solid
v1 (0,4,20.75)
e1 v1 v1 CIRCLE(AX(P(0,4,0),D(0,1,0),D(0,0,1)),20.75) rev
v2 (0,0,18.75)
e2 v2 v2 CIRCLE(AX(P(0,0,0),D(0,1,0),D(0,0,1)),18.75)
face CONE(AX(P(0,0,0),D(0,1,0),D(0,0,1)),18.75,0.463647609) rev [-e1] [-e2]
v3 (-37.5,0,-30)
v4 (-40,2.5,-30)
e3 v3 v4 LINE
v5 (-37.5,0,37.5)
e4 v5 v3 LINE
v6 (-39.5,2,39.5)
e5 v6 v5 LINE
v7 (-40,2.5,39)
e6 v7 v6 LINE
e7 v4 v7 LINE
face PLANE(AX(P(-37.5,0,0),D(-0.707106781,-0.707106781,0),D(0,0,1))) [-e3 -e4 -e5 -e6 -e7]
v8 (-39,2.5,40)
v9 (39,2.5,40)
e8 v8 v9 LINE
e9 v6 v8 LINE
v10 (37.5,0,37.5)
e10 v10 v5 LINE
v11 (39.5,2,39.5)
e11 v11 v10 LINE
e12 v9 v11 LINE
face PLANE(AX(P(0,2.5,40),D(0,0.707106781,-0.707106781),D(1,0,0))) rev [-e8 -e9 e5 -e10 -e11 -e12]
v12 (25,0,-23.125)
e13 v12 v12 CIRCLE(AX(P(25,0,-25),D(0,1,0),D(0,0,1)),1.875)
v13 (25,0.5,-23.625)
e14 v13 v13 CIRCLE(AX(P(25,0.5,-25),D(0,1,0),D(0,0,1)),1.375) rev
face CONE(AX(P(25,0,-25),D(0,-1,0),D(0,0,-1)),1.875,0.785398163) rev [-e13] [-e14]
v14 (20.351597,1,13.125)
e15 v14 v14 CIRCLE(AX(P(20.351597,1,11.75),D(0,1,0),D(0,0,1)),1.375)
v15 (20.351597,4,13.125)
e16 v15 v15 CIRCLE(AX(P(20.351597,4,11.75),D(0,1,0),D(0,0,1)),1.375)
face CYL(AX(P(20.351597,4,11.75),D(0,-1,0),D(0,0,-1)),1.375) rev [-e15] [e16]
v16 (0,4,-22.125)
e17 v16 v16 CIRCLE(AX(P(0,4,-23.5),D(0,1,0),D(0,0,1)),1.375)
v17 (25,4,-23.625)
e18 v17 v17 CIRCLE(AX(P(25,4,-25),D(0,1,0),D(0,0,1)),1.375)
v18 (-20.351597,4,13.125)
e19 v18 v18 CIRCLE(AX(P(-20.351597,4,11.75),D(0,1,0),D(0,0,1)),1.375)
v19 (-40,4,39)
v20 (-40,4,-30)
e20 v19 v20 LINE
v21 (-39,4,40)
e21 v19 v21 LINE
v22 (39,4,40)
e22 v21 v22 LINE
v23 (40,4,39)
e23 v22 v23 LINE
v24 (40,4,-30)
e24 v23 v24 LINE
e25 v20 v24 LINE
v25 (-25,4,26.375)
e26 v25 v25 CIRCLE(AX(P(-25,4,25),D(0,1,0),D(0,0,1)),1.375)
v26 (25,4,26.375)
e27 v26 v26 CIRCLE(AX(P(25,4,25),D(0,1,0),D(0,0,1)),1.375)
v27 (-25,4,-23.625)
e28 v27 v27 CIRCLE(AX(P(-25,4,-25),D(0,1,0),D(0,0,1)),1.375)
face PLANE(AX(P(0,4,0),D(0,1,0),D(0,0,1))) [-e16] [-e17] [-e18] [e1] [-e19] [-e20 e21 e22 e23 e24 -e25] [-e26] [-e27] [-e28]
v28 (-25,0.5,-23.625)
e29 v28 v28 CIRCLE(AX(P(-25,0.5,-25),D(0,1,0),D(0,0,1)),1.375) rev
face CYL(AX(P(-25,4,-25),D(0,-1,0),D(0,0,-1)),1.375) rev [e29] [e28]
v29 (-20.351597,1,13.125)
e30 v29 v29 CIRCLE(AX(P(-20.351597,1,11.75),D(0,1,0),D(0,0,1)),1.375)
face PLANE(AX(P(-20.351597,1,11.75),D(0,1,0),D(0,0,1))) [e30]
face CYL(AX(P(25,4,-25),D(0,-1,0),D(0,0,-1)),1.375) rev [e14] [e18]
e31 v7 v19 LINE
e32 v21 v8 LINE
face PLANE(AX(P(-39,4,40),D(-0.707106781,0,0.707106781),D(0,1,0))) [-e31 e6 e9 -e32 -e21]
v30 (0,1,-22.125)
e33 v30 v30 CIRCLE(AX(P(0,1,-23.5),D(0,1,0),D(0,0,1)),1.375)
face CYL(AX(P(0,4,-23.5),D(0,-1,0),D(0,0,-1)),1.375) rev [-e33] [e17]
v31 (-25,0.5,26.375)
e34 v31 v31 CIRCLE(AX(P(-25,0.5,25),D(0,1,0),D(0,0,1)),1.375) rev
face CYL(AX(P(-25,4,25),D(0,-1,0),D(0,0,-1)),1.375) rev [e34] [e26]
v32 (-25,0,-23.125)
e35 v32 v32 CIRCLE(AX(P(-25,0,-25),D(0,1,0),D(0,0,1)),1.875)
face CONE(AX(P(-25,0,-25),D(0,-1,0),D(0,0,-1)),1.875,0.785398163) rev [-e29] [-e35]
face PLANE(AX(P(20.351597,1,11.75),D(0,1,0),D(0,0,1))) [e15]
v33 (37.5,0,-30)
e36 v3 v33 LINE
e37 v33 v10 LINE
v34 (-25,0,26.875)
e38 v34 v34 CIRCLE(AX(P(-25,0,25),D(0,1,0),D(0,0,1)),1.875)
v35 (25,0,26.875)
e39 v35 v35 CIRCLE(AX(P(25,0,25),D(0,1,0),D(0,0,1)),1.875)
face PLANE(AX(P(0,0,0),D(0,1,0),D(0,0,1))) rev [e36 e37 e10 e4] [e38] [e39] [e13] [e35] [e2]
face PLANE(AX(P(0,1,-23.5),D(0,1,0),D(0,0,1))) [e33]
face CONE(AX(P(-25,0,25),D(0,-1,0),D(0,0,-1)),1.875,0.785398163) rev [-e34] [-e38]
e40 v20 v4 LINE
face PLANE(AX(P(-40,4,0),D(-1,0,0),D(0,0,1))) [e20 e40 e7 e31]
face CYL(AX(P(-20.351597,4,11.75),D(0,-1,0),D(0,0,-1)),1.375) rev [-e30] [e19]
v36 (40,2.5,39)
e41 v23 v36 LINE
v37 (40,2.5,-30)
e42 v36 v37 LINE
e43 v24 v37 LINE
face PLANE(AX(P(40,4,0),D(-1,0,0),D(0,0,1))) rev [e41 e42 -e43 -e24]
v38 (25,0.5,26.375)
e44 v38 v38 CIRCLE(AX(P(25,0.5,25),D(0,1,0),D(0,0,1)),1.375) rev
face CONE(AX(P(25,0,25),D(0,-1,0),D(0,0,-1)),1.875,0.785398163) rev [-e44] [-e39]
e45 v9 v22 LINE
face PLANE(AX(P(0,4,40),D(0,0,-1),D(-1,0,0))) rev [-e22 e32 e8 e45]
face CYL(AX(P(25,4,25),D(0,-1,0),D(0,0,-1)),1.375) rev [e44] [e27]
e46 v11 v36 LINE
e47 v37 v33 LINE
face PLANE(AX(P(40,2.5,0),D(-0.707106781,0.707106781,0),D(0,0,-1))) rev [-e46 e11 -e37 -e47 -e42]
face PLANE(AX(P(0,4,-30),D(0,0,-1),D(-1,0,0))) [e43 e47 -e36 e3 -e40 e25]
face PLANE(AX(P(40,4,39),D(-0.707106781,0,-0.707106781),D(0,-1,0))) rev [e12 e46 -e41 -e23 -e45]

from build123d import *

# Parameters (mm, degrees)
SKETCH1_R           = 18.75
SKETCH1_W           = 80
SKETCH1_H           = 10
BOSS_EXTRUDE2_DEPTH = 4
CHAMFER2_SIZE2      = 4
CHAMFER2_SIZE       = 2
SKETCH1_3_R         = 1.375
BOSS_EXTRUDE3_DEPTH = 1
CHAMFER3_SIZE       = 0.5
CHAMFER4_SIZE       = 1
CHAMFER5_SIZE       = 2.5


# Some blends are built 0.0001 mm under size
with BuildPart() as part:
    # Sketch1 → Boss-Extrude2 (new body)
    # profile 1 of 2: a face of its own
    with BuildSketch(Plane(origin=(0, 0, 0), x_dir=(1, 0, 0), z_dir=(0, 1, 0))):
        Polygon((-25, 30), (-40, 30), (-40, -30), (40, -30), (40, 30), (25, 30), align=None)
        with BuildLine():
            ThreePointArc((-23.625, -25), (-25.972271824, -25.972271824), (-25, -23.625))
            ThreePointArc((-25, -23.625), (-24.027728176, -24.027728176), (-23.625, -25))
        make_face(mode=Mode.SUBTRACT)
        with BuildLine():
            ThreePointArc((-19.629554465, -12.920162208), (-21.542381919, -12.4375), (-21.003965926, -10.539611728))
            ThreePointArc((-21.003965926, -10.539611728), (-19.646750299, -10.569400091), (-18.976596989, -11.75))
            ThreePointArc((-18.976596989, -11.75), (-19.150881896, -12.420006168), (-19.629554465, -12.920162208))
        make_face(mode=Mode.SUBTRACT)
        with BuildLine():
            ThreePointArc((26.375, -25), (24.027728176, -25.972271824), (25, -23.625))
            ThreePointArc((25, -23.625), (25.972271824, -24.027728176), (26.375, -25))
        make_face(mode=Mode.SUBTRACT)
        with BuildLine():
            ThreePointArc((21.726596989, -11.75), (21.021603157, -12.950715093), (19.629554465, -12.920162208))
            ThreePointArc((19.629554465, -12.920162208), (19.681590821, -10.549284907), (21.726596989, -11.75))
        make_face(mode=Mode.SUBTRACT)
        with BuildLine():
            ThreePointArc((-25, 23.625), (-26.375, 25), (-25, 26.375))
            ThreePointArc((-25, 26.375), (-24.027728176, 25.972271824), (-23.625, 25))
            ThreePointArc((-23.625, 25), (-24.027728176, 24.027728176), (-25, 23.625))
        make_face(mode=Mode.SUBTRACT)
        with Locations(Location((0, 0, 0), (0, 0, 270))):
            Circle(SKETCH1_R, mode=Mode.SUBTRACT)
        with BuildLine():
            ThreePointArc((1.375, 23.5), (0.020115184, 22.125147143), (-1.374411461, 23.459773936))
            ThreePointArc((-1.374411461, 23.459773936), (-0.020115184, 24.874852857), (1.375, 23.5))
        make_face(mode=Mode.SUBTRACT)
        with BuildLine():
            ThreePointArc((25, 23.625), (23.625, 25), (25, 26.375))
            ThreePointArc((25, 26.375), (25.972271824, 25.972271824), (26.375, 25))
            ThreePointArc((26.375, 25), (25.972271824, 24.027728176), (25, 23.625))
        make_face(mode=Mode.SUBTRACT)
    # profile 2 of 2: a face of its own
    with BuildSketch(Plane(origin=(0, 0, 0), x_dir=(1, 0, 0), z_dir=(0, 1, 0))):
        with Locations((0, -35)):
            Rectangle(SKETCH1_W, SKETCH1_H)
    extrude(amount=BOSS_EXTRUDE2_DEPTH)

    # Chamfer2
    chamfer2_edges = [part.edges().sort_by_distance(p)[0] for p in [
        (0, 4, -18.75),
    ]]
    chamfer2_side = [part.faces().sort_by_distance(p)[0] for p in [
        (0, 4, -18.79),
    ]]
    chamfer(chamfer2_edges, length=CHAMFER2_SIZE - 0.0001, length2=CHAMFER2_SIZE2 - 0.0001, reference=chamfer2_side[0])  # a hair under: the kernel refuses the full size

    # Sketch1<3> → Boss-Extrude3 (add)
    with BuildSketch(Plane(origin=(0, 0, 0), x_dir=(1, 0, 0), z_dir=(0, 1, 0))):
        with Locations(Location((0, 23.5, 0), (0, 0, 270))):
            Circle(SKETCH1_3_R)
        with Locations(Location((20.351596989, -11.75, 0), (0, 0, 270))):
            Circle(SKETCH1_3_R)
        with Locations(Location((-20.351596989, -11.75, 0), (0, 0, 270))):
            Circle(SKETCH1_3_R)
    extrude(amount=BOSS_EXTRUDE3_DEPTH)

    # Chamfer3
    chamfer3_edges = [part.edges().sort_by_distance(p)[0] for p in [
        (-25, 0, 26.375),
        (-26.375, 0, -25),
        (23.625, 0, -25),
        (25, 0, 26.375),
    ]]
    chamfer(chamfer3_edges, length=CHAMFER3_SIZE)

    # Chamfer4
    chamfer4_edges = [part.edges().sort_by_distance(p)[0] for p in [
        (40, 2, 40),
        (-40, 2, 40),
    ]]
    chamfer(chamfer4_edges, length=CHAMFER4_SIZE)

    # Chamfer5
    # the kernel refuses this chamfer: 2.5 mm, written as the material it takes off along each edge
    with BuildSketch(Plane(origin=(40, 0, -36.42920747), x_dir=(0.0274958766105877, 0.9996219169112968, 0), z_dir=(0, 0, 1))) as chamfer5_piece_1:
        Polygon((CHAMFER5_SIZE * 0.999621916911, CHAMFER5_SIZE * 0.0274958766106), (-CHAMFER5_SIZE * 0.0274958766106, CHAMFER5_SIZE * 0.999621916911), (0, 0), align=None)
    extrude(amount=81.85841494, mode=Mode.SUBTRACT)
    with BuildSketch(Plane(origin=(-45.42920747, 0, 40), x_dir=(0, 0.9996219169112968, 0.0274958766105877), z_dir=(1, 0, 0))) as chamfer5_piece_2:
        Polygon((CHAMFER5_SIZE * 0.999621916911, -CHAMFER5_SIZE * 0.0274958766106), (-CHAMFER5_SIZE * 0.0274958766106, -CHAMFER5_SIZE * 0.999621916911), (0, 0), align=None)
    extrude(amount=90.85841494, mode=Mode.SUBTRACT)
    with BuildSketch(Plane(origin=(-40, 0, -36.42920747), x_dir=(-0.0274958766105877, 0.9996219169112968, 0), z_dir=(0, 0, 1))) as chamfer5_piece_3:
        Polygon((CHAMFER5_SIZE * 0.999621916911, -CHAMFER5_SIZE * 0.0274958766106), (-CHAMFER5_SIZE * 0.0274958766106, -CHAMFER5_SIZE * 0.999621916911), (0, 0), align=None)
    extrude(amount=81.85841494, mode=Mode.SUBTRACT)


solid = part.part
